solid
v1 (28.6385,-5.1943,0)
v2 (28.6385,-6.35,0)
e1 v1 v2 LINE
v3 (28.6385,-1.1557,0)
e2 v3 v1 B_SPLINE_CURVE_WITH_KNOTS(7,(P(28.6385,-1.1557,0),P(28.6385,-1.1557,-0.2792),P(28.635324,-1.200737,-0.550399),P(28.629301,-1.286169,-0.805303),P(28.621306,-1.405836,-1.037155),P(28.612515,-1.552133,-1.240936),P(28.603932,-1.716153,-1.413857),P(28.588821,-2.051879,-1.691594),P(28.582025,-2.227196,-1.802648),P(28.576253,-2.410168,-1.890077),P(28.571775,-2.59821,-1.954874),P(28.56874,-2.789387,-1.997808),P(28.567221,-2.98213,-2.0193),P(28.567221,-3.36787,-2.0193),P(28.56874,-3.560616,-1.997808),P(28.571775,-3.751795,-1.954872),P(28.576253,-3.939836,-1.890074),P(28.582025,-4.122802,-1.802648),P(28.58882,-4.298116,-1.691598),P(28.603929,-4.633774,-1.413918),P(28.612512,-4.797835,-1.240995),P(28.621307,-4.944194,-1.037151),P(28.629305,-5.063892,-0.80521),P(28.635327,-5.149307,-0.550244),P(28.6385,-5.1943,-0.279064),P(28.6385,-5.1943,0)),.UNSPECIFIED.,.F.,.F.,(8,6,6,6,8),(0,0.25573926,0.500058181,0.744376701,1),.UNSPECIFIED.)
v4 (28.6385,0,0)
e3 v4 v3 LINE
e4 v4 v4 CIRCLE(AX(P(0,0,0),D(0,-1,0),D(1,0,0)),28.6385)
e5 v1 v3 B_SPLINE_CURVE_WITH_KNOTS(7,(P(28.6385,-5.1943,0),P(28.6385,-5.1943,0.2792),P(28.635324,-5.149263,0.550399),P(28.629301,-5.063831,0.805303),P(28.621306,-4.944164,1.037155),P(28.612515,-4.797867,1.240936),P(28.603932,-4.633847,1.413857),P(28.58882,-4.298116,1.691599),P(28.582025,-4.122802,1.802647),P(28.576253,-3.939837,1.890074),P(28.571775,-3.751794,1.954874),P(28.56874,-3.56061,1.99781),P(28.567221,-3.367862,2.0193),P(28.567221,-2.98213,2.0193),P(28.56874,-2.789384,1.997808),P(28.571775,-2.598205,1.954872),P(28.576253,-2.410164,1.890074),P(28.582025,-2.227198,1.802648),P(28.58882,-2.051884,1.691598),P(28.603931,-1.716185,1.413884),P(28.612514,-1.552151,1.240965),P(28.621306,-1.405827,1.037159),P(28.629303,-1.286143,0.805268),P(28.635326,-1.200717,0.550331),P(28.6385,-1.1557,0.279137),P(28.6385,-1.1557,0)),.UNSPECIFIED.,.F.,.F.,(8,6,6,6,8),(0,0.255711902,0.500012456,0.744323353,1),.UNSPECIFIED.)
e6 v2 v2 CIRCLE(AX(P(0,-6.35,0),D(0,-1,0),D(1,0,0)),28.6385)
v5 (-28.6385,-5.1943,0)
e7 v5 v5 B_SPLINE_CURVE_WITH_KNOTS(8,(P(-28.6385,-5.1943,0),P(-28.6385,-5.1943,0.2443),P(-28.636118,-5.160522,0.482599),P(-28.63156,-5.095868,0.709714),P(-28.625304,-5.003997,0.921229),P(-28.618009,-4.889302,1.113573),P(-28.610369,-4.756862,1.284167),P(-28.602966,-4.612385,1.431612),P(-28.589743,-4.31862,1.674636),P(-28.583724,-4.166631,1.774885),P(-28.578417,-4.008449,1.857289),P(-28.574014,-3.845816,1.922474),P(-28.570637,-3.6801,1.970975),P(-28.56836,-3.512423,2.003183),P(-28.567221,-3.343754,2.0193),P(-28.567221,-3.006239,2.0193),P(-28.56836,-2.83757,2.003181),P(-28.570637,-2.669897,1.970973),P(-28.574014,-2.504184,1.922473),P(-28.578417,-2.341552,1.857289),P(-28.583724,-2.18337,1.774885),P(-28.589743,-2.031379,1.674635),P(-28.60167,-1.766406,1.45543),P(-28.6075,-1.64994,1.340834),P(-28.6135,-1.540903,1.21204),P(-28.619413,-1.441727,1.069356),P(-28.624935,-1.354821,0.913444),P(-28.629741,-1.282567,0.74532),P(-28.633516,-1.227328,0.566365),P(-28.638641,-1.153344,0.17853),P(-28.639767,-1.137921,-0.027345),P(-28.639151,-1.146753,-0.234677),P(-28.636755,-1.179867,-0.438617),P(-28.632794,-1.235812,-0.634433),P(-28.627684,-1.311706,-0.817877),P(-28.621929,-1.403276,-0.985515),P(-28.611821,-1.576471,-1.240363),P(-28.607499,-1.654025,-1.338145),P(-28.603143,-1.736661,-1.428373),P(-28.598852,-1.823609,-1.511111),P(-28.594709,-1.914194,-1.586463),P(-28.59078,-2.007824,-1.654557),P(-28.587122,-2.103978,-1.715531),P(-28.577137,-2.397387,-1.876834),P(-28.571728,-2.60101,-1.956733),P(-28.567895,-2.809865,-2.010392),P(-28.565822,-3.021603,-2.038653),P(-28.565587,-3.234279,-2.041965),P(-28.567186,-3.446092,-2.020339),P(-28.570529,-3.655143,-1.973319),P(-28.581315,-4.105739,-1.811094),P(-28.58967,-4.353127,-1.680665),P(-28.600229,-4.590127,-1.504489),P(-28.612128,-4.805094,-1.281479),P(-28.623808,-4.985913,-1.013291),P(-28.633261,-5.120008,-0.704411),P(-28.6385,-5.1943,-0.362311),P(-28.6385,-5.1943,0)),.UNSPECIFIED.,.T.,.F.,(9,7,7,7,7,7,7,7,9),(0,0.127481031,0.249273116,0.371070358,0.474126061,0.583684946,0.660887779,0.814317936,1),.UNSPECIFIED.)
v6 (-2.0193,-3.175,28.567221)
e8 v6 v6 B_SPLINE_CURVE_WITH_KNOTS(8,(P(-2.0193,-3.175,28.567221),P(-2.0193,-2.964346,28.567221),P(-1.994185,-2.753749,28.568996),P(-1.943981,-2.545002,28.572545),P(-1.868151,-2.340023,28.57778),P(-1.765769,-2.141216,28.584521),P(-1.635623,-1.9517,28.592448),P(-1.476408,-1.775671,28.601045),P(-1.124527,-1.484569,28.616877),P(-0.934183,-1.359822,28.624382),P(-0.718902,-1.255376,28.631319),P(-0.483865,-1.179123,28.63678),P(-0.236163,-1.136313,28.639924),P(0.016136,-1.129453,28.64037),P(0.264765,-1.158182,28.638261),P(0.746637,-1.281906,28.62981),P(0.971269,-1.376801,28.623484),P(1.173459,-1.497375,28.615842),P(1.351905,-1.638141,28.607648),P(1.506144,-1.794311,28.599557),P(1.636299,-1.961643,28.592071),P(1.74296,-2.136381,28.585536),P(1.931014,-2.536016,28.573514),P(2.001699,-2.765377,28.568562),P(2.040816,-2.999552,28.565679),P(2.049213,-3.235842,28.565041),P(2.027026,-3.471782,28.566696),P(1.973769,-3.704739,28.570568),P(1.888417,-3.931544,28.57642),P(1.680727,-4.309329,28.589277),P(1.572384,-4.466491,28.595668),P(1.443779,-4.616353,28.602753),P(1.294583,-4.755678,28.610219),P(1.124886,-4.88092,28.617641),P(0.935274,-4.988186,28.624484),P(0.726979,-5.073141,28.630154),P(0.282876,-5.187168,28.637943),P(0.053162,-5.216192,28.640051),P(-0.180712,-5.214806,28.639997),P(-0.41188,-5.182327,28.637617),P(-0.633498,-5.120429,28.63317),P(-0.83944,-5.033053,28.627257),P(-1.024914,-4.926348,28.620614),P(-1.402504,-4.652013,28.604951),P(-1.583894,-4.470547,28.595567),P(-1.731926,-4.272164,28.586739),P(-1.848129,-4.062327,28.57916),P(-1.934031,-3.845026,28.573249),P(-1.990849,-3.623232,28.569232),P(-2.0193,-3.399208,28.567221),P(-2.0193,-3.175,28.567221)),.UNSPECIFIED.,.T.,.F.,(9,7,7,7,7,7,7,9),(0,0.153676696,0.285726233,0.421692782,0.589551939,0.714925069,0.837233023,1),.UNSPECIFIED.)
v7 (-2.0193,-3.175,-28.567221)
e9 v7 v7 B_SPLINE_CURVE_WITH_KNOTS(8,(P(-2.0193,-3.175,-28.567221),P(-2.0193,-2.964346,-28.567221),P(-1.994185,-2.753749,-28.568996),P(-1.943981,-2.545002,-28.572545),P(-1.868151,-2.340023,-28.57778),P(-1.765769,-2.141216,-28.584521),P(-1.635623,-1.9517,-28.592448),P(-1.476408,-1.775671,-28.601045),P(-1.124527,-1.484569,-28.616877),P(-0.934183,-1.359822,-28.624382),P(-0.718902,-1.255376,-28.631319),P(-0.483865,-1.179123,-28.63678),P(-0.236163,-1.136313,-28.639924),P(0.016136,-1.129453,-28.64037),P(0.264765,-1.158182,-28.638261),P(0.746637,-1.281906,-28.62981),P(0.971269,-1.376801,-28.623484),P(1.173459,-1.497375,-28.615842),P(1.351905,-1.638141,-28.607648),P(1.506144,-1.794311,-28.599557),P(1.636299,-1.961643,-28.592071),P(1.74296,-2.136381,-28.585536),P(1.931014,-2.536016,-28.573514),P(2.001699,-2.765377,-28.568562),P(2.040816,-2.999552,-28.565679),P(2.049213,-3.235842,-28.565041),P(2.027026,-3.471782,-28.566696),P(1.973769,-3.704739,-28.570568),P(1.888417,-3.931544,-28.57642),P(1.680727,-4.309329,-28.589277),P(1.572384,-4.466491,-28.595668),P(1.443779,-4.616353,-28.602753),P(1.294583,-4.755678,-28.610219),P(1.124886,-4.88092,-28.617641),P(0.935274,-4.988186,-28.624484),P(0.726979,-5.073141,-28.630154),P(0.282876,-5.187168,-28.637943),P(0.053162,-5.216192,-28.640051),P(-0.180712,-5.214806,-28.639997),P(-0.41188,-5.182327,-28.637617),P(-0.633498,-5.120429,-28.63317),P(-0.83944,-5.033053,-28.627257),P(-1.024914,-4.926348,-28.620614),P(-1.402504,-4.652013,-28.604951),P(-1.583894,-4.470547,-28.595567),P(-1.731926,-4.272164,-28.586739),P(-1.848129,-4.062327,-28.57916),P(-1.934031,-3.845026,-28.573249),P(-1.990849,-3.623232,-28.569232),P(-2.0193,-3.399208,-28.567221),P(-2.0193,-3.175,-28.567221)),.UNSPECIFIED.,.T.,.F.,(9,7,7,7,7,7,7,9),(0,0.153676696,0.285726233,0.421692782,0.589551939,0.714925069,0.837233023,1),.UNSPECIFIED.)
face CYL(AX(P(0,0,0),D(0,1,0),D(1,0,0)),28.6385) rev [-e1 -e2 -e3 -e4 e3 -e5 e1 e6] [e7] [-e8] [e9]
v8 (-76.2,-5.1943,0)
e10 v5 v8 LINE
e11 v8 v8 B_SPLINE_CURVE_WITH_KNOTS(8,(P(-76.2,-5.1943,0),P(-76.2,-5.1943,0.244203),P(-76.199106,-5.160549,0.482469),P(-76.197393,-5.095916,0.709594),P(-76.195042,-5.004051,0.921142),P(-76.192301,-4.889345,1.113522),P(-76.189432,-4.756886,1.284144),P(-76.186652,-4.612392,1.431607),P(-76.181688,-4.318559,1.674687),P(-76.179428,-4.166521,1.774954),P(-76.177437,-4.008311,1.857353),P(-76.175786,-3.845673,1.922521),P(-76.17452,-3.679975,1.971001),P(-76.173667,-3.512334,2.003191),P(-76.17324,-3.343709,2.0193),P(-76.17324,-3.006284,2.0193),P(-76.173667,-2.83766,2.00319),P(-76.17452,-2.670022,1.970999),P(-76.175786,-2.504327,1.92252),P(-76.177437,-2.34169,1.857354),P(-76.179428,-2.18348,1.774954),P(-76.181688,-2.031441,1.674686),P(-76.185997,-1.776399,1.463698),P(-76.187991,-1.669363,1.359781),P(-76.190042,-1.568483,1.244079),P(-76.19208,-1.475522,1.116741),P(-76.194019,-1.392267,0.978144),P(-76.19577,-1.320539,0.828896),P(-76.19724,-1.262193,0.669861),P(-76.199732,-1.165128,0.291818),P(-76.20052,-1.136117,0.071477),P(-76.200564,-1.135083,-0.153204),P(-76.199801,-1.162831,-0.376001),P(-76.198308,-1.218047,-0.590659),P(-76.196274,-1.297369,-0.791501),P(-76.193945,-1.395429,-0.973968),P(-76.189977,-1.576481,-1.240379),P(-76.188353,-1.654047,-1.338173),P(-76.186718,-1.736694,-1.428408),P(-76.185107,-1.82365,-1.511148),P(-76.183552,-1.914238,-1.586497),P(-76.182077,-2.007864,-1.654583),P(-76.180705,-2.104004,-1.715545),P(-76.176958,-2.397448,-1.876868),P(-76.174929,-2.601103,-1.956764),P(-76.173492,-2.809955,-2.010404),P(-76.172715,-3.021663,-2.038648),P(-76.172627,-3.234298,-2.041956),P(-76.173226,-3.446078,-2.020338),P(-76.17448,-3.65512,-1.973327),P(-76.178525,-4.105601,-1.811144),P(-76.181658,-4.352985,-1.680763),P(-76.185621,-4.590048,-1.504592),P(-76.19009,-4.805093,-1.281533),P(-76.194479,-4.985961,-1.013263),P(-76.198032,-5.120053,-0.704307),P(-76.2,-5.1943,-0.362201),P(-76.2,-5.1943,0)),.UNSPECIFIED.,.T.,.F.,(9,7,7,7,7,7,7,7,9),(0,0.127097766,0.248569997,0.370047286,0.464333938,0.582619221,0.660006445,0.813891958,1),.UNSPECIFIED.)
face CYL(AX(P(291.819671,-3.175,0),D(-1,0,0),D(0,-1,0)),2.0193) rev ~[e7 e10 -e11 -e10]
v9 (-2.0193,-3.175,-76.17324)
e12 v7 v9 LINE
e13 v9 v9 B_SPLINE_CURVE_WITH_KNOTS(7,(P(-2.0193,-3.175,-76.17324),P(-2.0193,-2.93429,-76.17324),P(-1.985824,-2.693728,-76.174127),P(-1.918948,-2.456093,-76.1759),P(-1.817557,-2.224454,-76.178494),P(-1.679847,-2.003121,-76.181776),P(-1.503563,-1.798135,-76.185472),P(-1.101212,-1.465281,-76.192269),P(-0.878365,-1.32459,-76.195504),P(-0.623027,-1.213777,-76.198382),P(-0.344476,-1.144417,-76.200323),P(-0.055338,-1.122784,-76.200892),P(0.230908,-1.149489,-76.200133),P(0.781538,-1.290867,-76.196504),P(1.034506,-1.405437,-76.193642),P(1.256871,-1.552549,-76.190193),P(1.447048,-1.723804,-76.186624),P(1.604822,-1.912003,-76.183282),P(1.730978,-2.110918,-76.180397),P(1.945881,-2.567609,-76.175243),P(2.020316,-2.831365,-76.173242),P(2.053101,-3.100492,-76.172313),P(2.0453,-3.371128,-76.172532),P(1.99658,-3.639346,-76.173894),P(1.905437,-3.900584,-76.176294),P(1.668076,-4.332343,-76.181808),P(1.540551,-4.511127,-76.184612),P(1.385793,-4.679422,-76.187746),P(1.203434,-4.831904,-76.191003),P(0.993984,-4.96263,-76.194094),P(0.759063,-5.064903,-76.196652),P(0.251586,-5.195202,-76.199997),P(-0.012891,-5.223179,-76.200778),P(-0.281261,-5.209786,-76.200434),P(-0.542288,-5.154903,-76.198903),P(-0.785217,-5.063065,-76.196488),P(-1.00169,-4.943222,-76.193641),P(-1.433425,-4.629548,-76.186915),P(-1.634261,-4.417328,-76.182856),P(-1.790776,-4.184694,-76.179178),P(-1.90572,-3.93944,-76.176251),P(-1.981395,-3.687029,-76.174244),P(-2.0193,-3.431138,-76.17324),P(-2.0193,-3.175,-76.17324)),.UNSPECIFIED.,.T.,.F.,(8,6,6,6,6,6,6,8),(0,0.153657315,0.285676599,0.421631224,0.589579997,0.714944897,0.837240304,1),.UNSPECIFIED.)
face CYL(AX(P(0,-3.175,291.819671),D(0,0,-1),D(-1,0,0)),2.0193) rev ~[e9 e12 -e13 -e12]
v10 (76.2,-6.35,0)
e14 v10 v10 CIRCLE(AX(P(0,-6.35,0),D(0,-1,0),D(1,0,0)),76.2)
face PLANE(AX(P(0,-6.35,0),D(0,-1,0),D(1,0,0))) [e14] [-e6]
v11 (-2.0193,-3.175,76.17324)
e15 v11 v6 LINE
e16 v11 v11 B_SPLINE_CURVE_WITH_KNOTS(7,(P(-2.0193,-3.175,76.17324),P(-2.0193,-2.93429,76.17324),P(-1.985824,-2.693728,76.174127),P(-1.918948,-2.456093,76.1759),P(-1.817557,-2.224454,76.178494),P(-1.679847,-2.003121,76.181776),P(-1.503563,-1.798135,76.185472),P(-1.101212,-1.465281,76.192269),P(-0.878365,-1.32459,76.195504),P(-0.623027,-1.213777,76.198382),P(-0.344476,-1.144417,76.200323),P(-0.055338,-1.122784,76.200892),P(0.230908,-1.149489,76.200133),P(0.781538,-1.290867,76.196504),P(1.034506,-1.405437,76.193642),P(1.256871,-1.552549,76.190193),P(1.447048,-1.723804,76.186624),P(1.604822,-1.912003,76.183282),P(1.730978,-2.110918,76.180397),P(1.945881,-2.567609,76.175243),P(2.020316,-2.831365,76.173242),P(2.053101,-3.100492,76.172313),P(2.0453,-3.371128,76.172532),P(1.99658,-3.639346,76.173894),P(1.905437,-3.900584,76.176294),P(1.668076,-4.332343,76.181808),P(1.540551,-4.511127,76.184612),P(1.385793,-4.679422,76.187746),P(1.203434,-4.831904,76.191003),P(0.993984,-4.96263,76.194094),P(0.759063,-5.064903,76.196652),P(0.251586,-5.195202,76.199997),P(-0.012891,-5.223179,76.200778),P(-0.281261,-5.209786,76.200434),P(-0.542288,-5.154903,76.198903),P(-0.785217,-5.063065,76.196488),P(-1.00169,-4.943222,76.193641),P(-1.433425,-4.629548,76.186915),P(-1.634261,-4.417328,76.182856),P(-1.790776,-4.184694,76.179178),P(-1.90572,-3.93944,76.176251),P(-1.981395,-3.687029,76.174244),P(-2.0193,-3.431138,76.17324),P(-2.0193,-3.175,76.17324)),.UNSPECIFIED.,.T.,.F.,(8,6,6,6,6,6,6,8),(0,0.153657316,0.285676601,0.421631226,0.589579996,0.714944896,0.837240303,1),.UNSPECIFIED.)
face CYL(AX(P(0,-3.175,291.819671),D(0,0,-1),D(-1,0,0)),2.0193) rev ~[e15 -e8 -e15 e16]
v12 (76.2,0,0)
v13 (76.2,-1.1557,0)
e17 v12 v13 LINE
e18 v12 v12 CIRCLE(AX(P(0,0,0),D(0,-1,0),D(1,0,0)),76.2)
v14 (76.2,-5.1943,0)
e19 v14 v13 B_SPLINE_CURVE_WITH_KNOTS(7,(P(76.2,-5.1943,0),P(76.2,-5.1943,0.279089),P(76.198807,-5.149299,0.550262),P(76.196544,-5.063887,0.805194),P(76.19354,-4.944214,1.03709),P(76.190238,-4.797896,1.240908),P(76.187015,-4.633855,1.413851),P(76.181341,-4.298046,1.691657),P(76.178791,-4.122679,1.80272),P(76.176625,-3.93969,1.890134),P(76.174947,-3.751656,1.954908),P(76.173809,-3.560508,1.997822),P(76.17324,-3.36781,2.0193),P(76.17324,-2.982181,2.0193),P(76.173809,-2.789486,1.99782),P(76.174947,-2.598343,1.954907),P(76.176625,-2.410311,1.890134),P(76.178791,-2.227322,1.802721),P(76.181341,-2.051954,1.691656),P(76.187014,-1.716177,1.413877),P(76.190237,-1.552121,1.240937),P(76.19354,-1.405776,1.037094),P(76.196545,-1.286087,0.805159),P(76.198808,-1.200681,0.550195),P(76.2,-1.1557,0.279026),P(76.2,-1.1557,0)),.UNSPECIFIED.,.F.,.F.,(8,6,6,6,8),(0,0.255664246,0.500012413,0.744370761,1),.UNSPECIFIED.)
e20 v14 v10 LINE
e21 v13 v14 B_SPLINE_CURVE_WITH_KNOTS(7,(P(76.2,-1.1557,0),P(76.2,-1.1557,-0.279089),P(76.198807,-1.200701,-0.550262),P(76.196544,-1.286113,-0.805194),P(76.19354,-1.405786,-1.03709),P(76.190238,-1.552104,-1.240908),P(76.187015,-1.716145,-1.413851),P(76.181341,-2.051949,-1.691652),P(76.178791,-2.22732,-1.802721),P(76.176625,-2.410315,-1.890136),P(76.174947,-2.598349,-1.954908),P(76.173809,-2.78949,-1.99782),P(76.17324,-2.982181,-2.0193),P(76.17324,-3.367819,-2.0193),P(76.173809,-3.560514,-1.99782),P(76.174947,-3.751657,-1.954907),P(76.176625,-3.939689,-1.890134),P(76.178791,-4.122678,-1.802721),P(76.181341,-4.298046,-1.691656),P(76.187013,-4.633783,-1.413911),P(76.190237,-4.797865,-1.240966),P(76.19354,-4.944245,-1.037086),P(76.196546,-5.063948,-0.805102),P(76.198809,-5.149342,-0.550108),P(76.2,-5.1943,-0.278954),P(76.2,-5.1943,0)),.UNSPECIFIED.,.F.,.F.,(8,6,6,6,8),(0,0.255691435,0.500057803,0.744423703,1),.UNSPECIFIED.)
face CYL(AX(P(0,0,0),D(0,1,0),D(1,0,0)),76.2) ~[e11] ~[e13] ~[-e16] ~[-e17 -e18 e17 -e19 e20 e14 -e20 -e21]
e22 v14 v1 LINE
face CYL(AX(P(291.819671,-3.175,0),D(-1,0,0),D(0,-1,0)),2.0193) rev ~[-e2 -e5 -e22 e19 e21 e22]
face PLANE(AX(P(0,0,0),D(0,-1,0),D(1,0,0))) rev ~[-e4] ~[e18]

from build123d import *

# Parameters (mm, degrees)
F0_R     = 76.2
F0_R_2   = 28.6385
F1_DEPTH = 6.35
F4_D     = 4.0386
F7_D     = 4.0386


# Not quite as in the source:
# - a feature names something its author has since deleted; it is built from what else it names


with BuildPart() as f1:
    # F0 (on Front) → F1 (new body)
    with BuildSketch(Plane.XZ):
        Circle(F0_R)
        Circle(F0_R_2, mode=Mode.SUBTRACT)
    extrude(amount=F1_DEPTH)

    # F4 (through all)
    with Locations(Plane.XY.offset(76.2)):
        with Locations((0, -3.175)):
            Hole(F4_D / 2)

    # F7 (through all)
    with Locations(Plane.YZ.offset(76.2)):
        with Locations((-3.175, 0)):
            Hole(F7_D / 2)


solid = f1.part
